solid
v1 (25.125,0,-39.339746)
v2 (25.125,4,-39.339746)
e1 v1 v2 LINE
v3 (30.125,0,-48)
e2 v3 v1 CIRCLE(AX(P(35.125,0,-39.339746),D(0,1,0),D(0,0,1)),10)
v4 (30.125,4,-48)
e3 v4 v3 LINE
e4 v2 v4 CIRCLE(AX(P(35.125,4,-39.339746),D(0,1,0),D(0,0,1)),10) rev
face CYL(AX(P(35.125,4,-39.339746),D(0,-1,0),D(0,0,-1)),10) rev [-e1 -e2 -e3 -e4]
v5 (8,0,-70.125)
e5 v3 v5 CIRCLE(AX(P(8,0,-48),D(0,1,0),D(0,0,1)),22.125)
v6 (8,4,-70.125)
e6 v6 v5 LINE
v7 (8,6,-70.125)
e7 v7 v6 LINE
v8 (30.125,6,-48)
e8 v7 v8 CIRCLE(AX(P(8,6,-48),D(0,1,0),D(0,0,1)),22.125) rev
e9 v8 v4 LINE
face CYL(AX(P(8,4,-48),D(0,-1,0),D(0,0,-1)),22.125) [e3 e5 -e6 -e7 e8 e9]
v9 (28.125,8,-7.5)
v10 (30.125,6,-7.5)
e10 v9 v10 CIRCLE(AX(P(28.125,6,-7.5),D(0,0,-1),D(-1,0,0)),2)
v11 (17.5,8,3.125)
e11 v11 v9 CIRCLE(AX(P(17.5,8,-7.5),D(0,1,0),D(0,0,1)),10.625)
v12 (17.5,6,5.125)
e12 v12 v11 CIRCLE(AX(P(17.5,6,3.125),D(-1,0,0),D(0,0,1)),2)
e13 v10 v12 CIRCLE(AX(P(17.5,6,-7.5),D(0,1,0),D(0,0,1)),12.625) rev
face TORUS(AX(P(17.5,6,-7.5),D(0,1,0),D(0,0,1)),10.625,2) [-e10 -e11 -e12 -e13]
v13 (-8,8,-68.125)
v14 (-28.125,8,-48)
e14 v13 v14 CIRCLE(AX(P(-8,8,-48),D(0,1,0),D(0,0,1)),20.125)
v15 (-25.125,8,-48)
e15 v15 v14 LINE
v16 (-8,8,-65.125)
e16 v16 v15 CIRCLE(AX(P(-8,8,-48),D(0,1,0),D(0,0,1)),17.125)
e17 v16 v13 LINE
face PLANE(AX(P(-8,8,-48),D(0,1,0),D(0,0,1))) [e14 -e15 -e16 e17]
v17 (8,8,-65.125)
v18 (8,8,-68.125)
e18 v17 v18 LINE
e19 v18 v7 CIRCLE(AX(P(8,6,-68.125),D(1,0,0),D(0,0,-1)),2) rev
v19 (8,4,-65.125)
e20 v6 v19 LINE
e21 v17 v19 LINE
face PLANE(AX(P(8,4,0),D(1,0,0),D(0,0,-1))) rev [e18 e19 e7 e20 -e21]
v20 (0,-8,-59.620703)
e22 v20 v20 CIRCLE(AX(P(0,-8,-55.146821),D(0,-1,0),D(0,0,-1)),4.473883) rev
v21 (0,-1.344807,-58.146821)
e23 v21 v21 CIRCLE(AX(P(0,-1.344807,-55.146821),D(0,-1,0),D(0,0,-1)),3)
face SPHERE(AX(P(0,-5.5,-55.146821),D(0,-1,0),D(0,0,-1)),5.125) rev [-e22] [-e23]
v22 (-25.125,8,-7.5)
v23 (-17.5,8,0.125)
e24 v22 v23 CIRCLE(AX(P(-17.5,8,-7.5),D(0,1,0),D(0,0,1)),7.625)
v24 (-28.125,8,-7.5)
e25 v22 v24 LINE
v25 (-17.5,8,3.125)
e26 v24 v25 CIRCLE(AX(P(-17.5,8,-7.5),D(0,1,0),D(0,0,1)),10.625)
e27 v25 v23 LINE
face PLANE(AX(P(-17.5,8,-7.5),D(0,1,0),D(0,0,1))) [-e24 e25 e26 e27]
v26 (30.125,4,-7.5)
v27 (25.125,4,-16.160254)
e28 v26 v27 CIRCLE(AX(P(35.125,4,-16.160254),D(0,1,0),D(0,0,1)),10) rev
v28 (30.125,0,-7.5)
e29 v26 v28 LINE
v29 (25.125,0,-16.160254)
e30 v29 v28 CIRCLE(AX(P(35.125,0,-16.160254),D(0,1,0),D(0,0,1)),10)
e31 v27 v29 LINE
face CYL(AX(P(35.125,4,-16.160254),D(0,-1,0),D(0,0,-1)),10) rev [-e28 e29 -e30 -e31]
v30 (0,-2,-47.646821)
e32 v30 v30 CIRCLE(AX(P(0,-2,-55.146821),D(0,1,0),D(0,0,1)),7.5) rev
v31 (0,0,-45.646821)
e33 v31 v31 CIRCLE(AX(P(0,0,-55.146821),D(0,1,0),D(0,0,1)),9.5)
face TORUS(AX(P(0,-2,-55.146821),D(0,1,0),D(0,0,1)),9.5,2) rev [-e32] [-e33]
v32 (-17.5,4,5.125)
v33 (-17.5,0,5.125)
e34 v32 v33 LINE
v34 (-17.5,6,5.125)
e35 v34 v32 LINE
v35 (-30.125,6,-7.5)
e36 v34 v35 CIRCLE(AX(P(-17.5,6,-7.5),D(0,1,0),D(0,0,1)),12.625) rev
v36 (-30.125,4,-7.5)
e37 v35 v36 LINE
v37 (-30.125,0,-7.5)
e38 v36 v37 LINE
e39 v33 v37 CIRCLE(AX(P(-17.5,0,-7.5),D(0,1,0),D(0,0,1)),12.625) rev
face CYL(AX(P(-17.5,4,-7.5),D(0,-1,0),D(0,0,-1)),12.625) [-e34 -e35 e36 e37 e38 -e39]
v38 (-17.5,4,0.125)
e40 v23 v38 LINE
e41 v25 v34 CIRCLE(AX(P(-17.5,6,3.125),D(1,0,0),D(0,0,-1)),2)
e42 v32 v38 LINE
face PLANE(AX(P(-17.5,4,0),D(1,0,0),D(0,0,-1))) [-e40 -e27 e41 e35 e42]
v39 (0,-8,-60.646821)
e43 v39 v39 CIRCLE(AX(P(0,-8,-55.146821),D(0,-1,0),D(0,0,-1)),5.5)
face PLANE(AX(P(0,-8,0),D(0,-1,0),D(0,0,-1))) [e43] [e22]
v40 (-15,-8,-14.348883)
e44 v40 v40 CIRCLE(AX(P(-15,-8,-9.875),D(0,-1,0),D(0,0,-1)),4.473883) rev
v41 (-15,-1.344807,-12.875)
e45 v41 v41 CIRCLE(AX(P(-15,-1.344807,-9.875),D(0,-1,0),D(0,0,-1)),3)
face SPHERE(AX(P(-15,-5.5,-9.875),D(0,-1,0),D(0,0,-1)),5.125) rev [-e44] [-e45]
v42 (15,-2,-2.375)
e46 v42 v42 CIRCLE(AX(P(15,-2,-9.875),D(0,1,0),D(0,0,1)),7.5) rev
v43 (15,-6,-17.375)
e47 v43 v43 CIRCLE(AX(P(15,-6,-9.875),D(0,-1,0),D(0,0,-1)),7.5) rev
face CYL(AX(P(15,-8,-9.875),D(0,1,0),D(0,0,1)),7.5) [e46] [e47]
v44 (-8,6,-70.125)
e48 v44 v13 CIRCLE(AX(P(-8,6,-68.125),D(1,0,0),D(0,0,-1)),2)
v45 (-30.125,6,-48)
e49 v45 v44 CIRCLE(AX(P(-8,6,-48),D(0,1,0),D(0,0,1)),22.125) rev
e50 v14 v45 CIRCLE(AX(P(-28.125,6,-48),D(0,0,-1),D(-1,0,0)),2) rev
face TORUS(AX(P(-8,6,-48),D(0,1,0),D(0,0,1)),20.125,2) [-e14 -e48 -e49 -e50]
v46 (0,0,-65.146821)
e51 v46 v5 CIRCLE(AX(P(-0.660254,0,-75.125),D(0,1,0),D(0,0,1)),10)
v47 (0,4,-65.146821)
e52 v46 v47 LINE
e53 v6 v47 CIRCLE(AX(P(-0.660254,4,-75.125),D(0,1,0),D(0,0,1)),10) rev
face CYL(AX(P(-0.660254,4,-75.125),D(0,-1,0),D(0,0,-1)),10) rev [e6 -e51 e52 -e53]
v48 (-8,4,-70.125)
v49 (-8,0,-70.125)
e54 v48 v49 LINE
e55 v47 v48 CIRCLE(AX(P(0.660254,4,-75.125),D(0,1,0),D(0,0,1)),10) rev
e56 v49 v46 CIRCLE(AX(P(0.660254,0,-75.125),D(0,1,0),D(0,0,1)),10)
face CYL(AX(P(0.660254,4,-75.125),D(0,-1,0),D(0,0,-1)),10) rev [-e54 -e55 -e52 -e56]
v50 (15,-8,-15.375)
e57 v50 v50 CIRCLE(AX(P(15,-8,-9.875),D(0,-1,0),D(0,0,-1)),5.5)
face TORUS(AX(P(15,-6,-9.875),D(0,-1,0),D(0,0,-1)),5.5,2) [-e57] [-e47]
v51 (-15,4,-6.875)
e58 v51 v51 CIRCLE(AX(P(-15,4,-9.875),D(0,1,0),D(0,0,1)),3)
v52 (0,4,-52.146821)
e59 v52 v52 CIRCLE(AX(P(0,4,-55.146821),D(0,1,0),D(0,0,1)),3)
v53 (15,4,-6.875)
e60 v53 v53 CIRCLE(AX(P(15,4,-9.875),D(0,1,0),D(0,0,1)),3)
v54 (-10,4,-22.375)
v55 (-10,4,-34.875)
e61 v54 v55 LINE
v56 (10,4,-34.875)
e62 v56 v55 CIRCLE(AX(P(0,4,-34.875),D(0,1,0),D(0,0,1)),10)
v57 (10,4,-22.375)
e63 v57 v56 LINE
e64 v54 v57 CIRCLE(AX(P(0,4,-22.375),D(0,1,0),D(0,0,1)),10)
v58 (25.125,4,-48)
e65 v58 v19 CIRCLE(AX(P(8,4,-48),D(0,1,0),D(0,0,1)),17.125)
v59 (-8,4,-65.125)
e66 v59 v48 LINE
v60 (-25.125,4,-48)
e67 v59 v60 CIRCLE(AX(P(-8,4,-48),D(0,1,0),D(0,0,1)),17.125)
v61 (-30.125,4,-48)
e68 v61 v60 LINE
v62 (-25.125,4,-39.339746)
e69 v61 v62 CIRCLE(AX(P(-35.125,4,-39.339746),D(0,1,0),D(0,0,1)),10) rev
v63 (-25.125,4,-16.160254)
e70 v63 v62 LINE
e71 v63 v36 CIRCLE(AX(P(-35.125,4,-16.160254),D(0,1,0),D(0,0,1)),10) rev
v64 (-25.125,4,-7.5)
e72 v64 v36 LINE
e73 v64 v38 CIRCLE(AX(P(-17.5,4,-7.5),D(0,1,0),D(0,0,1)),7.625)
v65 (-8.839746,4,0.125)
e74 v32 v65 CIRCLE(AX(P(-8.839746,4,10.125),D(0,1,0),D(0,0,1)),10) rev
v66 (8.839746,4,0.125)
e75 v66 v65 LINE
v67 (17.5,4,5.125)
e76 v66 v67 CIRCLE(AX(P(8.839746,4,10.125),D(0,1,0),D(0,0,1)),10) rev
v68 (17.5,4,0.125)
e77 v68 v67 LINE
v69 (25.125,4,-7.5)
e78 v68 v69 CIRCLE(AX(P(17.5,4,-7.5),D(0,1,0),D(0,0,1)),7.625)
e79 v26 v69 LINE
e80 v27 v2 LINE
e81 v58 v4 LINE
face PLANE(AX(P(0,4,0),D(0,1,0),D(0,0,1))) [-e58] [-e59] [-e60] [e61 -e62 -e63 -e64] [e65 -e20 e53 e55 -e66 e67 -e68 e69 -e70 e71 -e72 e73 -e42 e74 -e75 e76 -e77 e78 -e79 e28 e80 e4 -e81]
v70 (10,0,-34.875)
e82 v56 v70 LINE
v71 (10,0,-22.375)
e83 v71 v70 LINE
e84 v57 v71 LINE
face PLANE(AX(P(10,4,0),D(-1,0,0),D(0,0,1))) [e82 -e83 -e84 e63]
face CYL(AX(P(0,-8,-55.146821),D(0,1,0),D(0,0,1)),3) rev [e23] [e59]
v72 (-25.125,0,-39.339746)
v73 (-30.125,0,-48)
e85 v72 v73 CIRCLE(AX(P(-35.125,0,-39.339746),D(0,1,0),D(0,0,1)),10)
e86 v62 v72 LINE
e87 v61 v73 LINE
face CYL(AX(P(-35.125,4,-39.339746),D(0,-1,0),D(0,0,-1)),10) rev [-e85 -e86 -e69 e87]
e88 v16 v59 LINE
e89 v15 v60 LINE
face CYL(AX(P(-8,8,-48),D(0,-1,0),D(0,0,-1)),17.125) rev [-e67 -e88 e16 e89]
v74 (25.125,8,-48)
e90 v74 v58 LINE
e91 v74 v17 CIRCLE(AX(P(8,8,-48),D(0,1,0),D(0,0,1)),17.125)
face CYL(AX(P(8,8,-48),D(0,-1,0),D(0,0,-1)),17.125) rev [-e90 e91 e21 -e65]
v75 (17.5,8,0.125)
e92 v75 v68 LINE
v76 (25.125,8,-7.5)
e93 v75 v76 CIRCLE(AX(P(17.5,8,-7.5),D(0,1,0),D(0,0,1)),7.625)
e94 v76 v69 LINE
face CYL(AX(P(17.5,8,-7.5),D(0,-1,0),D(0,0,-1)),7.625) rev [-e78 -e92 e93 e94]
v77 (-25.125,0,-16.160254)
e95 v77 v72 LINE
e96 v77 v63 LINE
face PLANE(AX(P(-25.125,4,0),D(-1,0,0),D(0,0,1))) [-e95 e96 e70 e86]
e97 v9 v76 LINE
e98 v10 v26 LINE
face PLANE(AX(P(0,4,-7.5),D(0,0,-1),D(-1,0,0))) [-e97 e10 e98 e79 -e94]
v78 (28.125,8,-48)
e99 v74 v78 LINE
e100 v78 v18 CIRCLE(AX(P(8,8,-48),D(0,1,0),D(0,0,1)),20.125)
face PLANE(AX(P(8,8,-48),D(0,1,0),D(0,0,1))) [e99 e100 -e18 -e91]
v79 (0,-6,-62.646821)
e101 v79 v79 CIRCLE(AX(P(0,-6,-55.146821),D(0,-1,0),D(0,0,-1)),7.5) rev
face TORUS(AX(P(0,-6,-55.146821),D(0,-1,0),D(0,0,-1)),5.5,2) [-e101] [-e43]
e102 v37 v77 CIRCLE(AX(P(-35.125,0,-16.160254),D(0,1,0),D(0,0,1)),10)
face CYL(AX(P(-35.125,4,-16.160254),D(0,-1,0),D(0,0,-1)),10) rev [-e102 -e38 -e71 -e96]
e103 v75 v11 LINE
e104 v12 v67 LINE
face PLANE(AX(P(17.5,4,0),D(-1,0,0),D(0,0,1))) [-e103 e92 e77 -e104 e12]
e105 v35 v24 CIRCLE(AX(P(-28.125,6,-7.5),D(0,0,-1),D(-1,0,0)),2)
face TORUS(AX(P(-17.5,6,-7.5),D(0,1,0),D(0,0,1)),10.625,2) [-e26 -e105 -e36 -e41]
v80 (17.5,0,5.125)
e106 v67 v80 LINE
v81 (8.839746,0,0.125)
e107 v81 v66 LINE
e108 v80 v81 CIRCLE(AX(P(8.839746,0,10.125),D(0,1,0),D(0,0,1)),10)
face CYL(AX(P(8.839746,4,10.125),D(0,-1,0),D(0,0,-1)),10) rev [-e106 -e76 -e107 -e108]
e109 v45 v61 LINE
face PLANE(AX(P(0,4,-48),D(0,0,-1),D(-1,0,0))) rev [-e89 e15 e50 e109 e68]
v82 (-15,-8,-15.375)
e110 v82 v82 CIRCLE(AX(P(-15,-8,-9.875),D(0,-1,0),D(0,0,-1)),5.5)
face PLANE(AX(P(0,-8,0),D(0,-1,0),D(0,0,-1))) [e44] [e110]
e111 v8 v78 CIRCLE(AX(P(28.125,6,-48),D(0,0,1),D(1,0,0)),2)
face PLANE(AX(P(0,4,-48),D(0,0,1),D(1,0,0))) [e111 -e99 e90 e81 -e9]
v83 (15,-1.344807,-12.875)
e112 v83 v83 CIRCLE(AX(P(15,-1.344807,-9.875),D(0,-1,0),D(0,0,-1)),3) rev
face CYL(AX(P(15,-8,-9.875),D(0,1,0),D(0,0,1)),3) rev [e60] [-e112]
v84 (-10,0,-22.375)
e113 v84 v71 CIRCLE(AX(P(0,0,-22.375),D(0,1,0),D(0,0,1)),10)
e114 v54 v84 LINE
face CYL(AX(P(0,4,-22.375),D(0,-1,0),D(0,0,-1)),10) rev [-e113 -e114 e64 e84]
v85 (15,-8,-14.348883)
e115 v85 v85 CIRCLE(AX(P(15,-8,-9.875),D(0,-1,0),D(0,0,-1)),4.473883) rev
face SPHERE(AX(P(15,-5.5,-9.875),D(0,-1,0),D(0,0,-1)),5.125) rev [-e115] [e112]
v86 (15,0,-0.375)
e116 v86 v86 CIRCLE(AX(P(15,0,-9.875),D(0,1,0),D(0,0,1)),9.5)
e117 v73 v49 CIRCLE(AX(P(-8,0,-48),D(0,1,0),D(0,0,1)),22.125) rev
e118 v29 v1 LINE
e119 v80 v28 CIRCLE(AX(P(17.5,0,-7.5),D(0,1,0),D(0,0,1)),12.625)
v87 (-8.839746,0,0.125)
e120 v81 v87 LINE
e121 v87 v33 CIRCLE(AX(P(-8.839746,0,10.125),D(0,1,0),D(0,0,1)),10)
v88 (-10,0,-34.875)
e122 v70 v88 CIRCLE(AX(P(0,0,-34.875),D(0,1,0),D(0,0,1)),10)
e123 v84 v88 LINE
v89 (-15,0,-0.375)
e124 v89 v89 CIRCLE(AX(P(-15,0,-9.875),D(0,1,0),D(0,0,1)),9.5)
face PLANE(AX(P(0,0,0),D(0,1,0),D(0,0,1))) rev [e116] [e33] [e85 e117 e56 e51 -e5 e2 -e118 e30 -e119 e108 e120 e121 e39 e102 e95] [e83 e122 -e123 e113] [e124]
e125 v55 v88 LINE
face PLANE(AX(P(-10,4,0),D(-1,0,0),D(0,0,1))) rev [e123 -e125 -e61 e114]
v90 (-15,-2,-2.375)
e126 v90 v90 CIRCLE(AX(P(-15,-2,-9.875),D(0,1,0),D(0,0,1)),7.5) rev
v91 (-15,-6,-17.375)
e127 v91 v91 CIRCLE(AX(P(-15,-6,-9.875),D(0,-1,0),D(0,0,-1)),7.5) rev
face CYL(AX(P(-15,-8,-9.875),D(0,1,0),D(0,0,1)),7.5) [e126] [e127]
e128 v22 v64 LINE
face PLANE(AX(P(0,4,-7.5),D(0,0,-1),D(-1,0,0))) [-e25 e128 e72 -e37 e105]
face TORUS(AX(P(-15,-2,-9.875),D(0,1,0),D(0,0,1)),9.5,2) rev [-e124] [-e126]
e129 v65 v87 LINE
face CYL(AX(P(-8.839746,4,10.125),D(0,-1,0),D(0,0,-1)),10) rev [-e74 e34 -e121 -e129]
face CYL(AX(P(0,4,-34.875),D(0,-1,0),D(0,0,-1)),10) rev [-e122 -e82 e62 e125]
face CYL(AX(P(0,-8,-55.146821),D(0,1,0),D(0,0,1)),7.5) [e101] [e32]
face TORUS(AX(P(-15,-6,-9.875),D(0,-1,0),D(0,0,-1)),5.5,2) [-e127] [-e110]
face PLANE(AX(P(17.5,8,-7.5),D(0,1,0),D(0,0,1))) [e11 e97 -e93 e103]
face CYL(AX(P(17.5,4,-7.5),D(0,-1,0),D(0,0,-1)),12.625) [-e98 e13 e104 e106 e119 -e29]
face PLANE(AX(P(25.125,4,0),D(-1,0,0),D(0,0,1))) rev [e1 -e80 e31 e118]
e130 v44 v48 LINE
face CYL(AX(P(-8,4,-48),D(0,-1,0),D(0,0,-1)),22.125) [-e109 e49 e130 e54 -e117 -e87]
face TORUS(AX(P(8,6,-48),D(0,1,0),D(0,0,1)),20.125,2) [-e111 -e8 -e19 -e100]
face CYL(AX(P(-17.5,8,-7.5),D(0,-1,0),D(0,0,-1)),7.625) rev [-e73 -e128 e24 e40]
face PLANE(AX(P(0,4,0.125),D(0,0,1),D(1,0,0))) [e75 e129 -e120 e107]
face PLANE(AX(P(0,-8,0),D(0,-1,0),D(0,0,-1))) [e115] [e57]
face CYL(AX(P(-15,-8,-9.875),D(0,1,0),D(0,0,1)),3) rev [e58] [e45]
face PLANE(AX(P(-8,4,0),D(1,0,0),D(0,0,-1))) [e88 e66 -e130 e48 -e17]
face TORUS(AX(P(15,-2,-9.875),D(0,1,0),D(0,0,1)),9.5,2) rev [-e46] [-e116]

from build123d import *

# Parameters (mm, degrees)
SALIENTE_EXTRUIR1_DEPTH  = 4
SALIENTE_EXTRUIR2_START  = 4
SALIENTE_EXTRUIR2_DEPTH  = 4
REDONDEO1_R              = 10
REDONDEO3_R              = 2
CROQUIS2_R               = 7.5
CROQUIS2_R_2             = 3
SALIENTE_EXTRUIR3_DEPTH  = 8
CROQUIS2_3_R             = 7.5
CROQUIS2_3_R_2           = 3
SALIENTE_EXTRUIR4_DEPTH  = 8
REDONDEO4_R              = 2
REDONDEO5_R              = 2
REDONDEO4_OF_SIMETR_A1_R = 2
CROQUIS2_4_R             = 3
CORTAR_EXTRUIR1_DEPTH    = 77.740023923
CROQUIS5_R               = 3
CORTAR_EXTRUIR2_DEPTH    = 77.740023923


with BuildPart() as part:
    # Croquis1 → Saliente-Extruir1 (new body)
    with BuildSketch(Plane(origin=(0, 0, 0), x_dir=(1, 0, 0), z_dir=(0, 1, 0))):
        with BuildLine():
            Line((30.125, 7.5), (25.125, 7.5))
            Line((25.125, 7.5), (25.125, 48))
            Line((25.125, 48), (30.125, 48))
            ThreePointArc((30.125, 48), (23.644737534, 63.644737534), (8, 70.125))
            Line((8, 70.125), (8, 65.125))
            Line((8, 65.125), (-8, 65.125))
            Line((-8, 65.125), (-8, 70.125))
            ThreePointArc((-8, 70.125), (-23.644737534, 63.644737534), (-30.125, 48))
            Line((-30.125, 48), (-25.125, 48))
            Line((-25.125, 48), (-25.125, 7.5))
            Line((-25.125, 7.5), (-30.125, 7.5))
            ThreePointArc((-30.125, 7.5), (-26.427223112, -1.427223112), (-17.5, -5.125))
            Line((-17.5, -5.125), (-17.5, -0.125))
            Line((-17.5, -0.125), (17.5, -0.125))
            Line((17.5, -0.125), (17.5, -5.125))
            ThreePointArc((17.5, -5.125), (26.427223112, -1.427223112), (30.125, 7.5))
        make_face()
        with BuildLine():
            ThreePointArc((10, 22.375), (0, 12.375), (-10, 22.375))
            Line((-10, 22.375), (-10, 34.875))
            ThreePointArc((-10, 34.875), (0, 44.875), (10, 34.875))
            Line((10, 34.875), (10, 22.375))
        make_face(mode=Mode.SUBTRACT)
    extrude(amount=SALIENTE_EXTRUIR1_DEPTH)

    # Croquis1<3> → Saliente-Extruir2 (add)
    with BuildSketch(Plane(origin=(0, 0, 0), x_dir=(1, 0, 0), z_dir=(0, 1, 0)).offset(SALIENTE_EXTRUIR2_START)):
        with BuildLine():
            Line((-30.125, 48), (-25.125, 48))
            ThreePointArc((-25.125, 48), (-20.109203628, 60.109203628), (-8, 65.125))
            Line((-8, 65.125), (-8, 70.125))
            ThreePointArc((-8, 70.125), (-23.644737534, 63.644737534), (-30.125, 48))
        make_face()
        with BuildLine():
            Line((-17.5, -5.125), (-17.5, -0.125))
            ThreePointArc((-17.5, -0.125), (-22.891689207, 2.108310793), (-25.125, 7.5))
            Line((-25.125, 7.5), (-30.125, 7.5))
            ThreePointArc((-30.125, 7.5), (-26.427223112, -1.427223112), (-17.5, -5.125))
        make_face()
        with BuildLine():
            ThreePointArc((25.125, 7.5), (22.891689207, 2.108310793), (17.5, -0.125))
            Line((17.5, -0.125), (17.5, -5.125))
            ThreePointArc((17.5, -5.125), (26.427223112, -1.427223112), (30.125, 7.5))
            Line((30.125, 7.5), (25.125, 7.5))
        make_face()
        with BuildLine():
            ThreePointArc((8, 65.125), (20.109203628, 60.109203628), (25.125, 48))
            Line((25.125, 48), (30.125, 48))
            ThreePointArc((30.125, 48), (23.644737534, 63.644737534), (8, 70.125))
            Line((8, 70.125), (8, 65.125))
        make_face()
    extrude(amount=SALIENTE_EXTRUIR2_DEPTH)

    # Redondeo1
    # the kernel refuses this fillet: 10 mm, written as the material it adds along each edge
    with BuildSketch(Plane(origin=(8, 0, -65.125), x_dir=(-1, 0, 0), z_dir=(0, 1, 0)), Plane(origin=(-17.5, 0, 0.125), x_dir=(1, 0, 0), z_dir=(0, 1, 0)), Plane(origin=(-25.125, 0, -48), x_dir=(0, 0, 1), z_dir=(0, 1, 0))) as redondeo1_piece_1:
        with BuildLine():
            CenterArc((8.660254038, -10), REDONDEO1_R, 90, 60)
            Line((0, -5), (-0.173205081, -4.9))
            ThreePointArc((-0.173205081, -4.9), (-0.2, -2.5), (-0.2, 0))
            Line((-0.2, 0), (0, 0.2))
            Line((0, 0.2), (8.660254038, 0.2))
            Line((8.660254038, 0.2), (8.660254038, 0))
        make_face()
    extrude(amount=4)
    with BuildSketch(Plane(origin=(-8, 0, -65.125), x_dir=(0, 0, -1), z_dir=(0, 1, 0)), Plane(origin=(17.5, 0, 0.125), x_dir=(0, 0, 1), z_dir=(0, 1, 0)), Plane(origin=(25.125, 0, -48), x_dir=(1, 0, 0), z_dir=(0, 1, 0)), Plane(origin=(-25.125, 0, -7.5), x_dir=(-1, 0, 0), z_dir=(0, 1, 0))) as redondeo1_piece_2:
        with BuildLine():
            CenterArc((10, -8.660254038), REDONDEO1_R, 120, 60)
            Line((0, -8.660254038), (-0.2, -8.660254038))
            Line((-0.2, -8.660254038), (-0.2, 0))
            Line((-0.2, 0), (0, 0.2))
            ThreePointArc((0, 0.2), (2.5, 0.2), (4.9, 0.173205081))
            Line((4.9, 0.173205081), (5, 0))
        make_face()
    extrude(amount=4)
    with BuildSketch(Plane(origin=(25.125, 0, -7.5), x_dir=(1, 0, 0), z_dir=(0, 1, 0))) as redondeo1_piece_3:
        with BuildLine():
            CenterArc((10, 8.660254038), REDONDEO1_R, 180, 60)
            Line((0, 8.660254038), (-0.2, 8.660254038))
            Line((-0.2, 8.660254038), (-0.2, 0))
            Line((-0.2, 0), (0, -0.2))
            ThreePointArc((0, -0.2), (2.5, -0.2), (4.9, -0.173205081))
            Line((4.9, -0.173205081), (5, 0))
        make_face()
    extrude(amount=4)

    # Redondeo3
    redondeo3_edges = [part.edges().sort_by_distance(p)[0] for p in [
        (-23.644737534, 8, -63.644737534),
        (-26.427223112, 8, 1.427223112),
        (26.427223112, 8, 1.427223112),
        (23.644737534, 8, -63.644737534),
    ]]
    fillet(redondeo3_edges, radius=REDONDEO3_R)

    # Croquis2 → Saliente-Extruir3 (add)
    with BuildSketch(Plane.XZ):
        with Locations(Location((-15, -9.875, 0), (0, 0, 90))):
            Circle(CROQUIS2_R)
        with Locations(Location((-15, -9.875, 0), (0, 0, 270))):
            Circle(CROQUIS2_R_2, mode=Mode.SUBTRACT)
    saliente_extruir3 = extrude(amount=SALIENTE_EXTRUIR3_DEPTH)

    # Croquis2<3> → Saliente-Extruir4 (add)
    with BuildSketch(Plane.XZ):
        with Locations(Location((0, -55.146820577, 0), (0, 0, 90))):
            Circle(CROQUIS2_3_R)
        with Locations(Location((0, -55.146820577, 0), (0, 0, 270))):
            Circle(CROQUIS2_3_R_2, mode=Mode.SUBTRACT)
    extrude(amount=SALIENTE_EXTRUIR4_DEPTH)

    # Croquis3 → Cortar-Revolución1 (revolve, cut)
    with BuildSketch(Plane.XY.offset(-9.875)):
        with BuildLine():
            Line((-9.875, -5.5), (-20.125, -5.5))
            ThreePointArc((-20.125, -5.5), (-15, -10.625), (-9.875, -5.5))
        make_face()
    cortar_revoluci_n1 = revolve(axis=Axis((-9.875, -5.5, -9.875), (-1, 0, 0)), mode=Mode.SUBTRACT)

    # Croquis4 → Cortar-Revolución2 (revolve, cut)
    with BuildSketch(Plane.XY.offset(-55.146820577)):
        with BuildLine():
            Line((5.125, -5.5), (-5.125, -5.5))
            ThreePointArc((-5.125, -5.5), (0, -10.625), (5.125, -5.5))
        make_face()
    revolve(axis=Axis((5.125, -5.5, -55.146820577), (-1, 0, 0)), mode=Mode.SUBTRACT)

    # Redondeo4
    redondeo4_edges = [part.edges().sort_by_distance(p)[0] for p in [
        (-15, 0, -17.375),
        (-15, -8, -17.375),
    ]]
    fillet(redondeo4_edges, radius=REDONDEO4_R)

    # Redondeo5
    redondeo5_edges = [part.edges().sort_by_distance(p)[0] for p in [
        (0, 0, -62.646820577),
        (0, -8, -62.646820577),
    ]]
    fillet(redondeo5_edges, radius=REDONDEO5_R)

    # Simetría1: Saliente-Extruir3, Cortar-Revolución1 across plane
    add(saliente_extruir3.mirror(Plane(origin=(0, 0, 0), x_dir=(0, 0, 1), z_dir=(1, 0, 0))))
    add(cortar_revoluci_n1.mirror(Plane(origin=(0, 0, 0), x_dir=(0, 0, 1), z_dir=(1, 0, 0))), mode=Mode.SUBTRACT)

    # Redondeo4 of Simetría1
    redondeo4_of_simetr_a1_edges = [part.edges().sort_by_distance(p)[0] for p in [
        (15, 0, -17.375),
        (15, -8, -17.375),
    ]]
    fillet(redondeo4_of_simetr_a1_edges, radius=REDONDEO4_OF_SIMETR_A1_R)

    # Croquis2<4> → Cortar-Extruir1 (cut, through all)
    with BuildSketch(Plane.XZ):
        with Locations(Location((0, -55.146820577, 0), (0, 0, 90))):
            Circle(CROQUIS2_4_R)
        with Locations(Location((-15, -9.875, 0), (0, 0, 90))):
            Circle(CROQUIS2_4_R)
    extrude(amount=-CORTAR_EXTRUIR1_DEPTH, mode=Mode.SUBTRACT)

    # Croquis5 → Cortar-Extruir2 (cut, through all)
    with BuildSketch(Plane.XZ):
        with Locations(Location((15, -9.875, 0), (0, 0, 90))):
            Circle(CROQUIS5_R)
    extrude(amount=-CORTAR_EXTRUIR2_DEPTH, mode=Mode.SUBTRACT)


solid = part.part
